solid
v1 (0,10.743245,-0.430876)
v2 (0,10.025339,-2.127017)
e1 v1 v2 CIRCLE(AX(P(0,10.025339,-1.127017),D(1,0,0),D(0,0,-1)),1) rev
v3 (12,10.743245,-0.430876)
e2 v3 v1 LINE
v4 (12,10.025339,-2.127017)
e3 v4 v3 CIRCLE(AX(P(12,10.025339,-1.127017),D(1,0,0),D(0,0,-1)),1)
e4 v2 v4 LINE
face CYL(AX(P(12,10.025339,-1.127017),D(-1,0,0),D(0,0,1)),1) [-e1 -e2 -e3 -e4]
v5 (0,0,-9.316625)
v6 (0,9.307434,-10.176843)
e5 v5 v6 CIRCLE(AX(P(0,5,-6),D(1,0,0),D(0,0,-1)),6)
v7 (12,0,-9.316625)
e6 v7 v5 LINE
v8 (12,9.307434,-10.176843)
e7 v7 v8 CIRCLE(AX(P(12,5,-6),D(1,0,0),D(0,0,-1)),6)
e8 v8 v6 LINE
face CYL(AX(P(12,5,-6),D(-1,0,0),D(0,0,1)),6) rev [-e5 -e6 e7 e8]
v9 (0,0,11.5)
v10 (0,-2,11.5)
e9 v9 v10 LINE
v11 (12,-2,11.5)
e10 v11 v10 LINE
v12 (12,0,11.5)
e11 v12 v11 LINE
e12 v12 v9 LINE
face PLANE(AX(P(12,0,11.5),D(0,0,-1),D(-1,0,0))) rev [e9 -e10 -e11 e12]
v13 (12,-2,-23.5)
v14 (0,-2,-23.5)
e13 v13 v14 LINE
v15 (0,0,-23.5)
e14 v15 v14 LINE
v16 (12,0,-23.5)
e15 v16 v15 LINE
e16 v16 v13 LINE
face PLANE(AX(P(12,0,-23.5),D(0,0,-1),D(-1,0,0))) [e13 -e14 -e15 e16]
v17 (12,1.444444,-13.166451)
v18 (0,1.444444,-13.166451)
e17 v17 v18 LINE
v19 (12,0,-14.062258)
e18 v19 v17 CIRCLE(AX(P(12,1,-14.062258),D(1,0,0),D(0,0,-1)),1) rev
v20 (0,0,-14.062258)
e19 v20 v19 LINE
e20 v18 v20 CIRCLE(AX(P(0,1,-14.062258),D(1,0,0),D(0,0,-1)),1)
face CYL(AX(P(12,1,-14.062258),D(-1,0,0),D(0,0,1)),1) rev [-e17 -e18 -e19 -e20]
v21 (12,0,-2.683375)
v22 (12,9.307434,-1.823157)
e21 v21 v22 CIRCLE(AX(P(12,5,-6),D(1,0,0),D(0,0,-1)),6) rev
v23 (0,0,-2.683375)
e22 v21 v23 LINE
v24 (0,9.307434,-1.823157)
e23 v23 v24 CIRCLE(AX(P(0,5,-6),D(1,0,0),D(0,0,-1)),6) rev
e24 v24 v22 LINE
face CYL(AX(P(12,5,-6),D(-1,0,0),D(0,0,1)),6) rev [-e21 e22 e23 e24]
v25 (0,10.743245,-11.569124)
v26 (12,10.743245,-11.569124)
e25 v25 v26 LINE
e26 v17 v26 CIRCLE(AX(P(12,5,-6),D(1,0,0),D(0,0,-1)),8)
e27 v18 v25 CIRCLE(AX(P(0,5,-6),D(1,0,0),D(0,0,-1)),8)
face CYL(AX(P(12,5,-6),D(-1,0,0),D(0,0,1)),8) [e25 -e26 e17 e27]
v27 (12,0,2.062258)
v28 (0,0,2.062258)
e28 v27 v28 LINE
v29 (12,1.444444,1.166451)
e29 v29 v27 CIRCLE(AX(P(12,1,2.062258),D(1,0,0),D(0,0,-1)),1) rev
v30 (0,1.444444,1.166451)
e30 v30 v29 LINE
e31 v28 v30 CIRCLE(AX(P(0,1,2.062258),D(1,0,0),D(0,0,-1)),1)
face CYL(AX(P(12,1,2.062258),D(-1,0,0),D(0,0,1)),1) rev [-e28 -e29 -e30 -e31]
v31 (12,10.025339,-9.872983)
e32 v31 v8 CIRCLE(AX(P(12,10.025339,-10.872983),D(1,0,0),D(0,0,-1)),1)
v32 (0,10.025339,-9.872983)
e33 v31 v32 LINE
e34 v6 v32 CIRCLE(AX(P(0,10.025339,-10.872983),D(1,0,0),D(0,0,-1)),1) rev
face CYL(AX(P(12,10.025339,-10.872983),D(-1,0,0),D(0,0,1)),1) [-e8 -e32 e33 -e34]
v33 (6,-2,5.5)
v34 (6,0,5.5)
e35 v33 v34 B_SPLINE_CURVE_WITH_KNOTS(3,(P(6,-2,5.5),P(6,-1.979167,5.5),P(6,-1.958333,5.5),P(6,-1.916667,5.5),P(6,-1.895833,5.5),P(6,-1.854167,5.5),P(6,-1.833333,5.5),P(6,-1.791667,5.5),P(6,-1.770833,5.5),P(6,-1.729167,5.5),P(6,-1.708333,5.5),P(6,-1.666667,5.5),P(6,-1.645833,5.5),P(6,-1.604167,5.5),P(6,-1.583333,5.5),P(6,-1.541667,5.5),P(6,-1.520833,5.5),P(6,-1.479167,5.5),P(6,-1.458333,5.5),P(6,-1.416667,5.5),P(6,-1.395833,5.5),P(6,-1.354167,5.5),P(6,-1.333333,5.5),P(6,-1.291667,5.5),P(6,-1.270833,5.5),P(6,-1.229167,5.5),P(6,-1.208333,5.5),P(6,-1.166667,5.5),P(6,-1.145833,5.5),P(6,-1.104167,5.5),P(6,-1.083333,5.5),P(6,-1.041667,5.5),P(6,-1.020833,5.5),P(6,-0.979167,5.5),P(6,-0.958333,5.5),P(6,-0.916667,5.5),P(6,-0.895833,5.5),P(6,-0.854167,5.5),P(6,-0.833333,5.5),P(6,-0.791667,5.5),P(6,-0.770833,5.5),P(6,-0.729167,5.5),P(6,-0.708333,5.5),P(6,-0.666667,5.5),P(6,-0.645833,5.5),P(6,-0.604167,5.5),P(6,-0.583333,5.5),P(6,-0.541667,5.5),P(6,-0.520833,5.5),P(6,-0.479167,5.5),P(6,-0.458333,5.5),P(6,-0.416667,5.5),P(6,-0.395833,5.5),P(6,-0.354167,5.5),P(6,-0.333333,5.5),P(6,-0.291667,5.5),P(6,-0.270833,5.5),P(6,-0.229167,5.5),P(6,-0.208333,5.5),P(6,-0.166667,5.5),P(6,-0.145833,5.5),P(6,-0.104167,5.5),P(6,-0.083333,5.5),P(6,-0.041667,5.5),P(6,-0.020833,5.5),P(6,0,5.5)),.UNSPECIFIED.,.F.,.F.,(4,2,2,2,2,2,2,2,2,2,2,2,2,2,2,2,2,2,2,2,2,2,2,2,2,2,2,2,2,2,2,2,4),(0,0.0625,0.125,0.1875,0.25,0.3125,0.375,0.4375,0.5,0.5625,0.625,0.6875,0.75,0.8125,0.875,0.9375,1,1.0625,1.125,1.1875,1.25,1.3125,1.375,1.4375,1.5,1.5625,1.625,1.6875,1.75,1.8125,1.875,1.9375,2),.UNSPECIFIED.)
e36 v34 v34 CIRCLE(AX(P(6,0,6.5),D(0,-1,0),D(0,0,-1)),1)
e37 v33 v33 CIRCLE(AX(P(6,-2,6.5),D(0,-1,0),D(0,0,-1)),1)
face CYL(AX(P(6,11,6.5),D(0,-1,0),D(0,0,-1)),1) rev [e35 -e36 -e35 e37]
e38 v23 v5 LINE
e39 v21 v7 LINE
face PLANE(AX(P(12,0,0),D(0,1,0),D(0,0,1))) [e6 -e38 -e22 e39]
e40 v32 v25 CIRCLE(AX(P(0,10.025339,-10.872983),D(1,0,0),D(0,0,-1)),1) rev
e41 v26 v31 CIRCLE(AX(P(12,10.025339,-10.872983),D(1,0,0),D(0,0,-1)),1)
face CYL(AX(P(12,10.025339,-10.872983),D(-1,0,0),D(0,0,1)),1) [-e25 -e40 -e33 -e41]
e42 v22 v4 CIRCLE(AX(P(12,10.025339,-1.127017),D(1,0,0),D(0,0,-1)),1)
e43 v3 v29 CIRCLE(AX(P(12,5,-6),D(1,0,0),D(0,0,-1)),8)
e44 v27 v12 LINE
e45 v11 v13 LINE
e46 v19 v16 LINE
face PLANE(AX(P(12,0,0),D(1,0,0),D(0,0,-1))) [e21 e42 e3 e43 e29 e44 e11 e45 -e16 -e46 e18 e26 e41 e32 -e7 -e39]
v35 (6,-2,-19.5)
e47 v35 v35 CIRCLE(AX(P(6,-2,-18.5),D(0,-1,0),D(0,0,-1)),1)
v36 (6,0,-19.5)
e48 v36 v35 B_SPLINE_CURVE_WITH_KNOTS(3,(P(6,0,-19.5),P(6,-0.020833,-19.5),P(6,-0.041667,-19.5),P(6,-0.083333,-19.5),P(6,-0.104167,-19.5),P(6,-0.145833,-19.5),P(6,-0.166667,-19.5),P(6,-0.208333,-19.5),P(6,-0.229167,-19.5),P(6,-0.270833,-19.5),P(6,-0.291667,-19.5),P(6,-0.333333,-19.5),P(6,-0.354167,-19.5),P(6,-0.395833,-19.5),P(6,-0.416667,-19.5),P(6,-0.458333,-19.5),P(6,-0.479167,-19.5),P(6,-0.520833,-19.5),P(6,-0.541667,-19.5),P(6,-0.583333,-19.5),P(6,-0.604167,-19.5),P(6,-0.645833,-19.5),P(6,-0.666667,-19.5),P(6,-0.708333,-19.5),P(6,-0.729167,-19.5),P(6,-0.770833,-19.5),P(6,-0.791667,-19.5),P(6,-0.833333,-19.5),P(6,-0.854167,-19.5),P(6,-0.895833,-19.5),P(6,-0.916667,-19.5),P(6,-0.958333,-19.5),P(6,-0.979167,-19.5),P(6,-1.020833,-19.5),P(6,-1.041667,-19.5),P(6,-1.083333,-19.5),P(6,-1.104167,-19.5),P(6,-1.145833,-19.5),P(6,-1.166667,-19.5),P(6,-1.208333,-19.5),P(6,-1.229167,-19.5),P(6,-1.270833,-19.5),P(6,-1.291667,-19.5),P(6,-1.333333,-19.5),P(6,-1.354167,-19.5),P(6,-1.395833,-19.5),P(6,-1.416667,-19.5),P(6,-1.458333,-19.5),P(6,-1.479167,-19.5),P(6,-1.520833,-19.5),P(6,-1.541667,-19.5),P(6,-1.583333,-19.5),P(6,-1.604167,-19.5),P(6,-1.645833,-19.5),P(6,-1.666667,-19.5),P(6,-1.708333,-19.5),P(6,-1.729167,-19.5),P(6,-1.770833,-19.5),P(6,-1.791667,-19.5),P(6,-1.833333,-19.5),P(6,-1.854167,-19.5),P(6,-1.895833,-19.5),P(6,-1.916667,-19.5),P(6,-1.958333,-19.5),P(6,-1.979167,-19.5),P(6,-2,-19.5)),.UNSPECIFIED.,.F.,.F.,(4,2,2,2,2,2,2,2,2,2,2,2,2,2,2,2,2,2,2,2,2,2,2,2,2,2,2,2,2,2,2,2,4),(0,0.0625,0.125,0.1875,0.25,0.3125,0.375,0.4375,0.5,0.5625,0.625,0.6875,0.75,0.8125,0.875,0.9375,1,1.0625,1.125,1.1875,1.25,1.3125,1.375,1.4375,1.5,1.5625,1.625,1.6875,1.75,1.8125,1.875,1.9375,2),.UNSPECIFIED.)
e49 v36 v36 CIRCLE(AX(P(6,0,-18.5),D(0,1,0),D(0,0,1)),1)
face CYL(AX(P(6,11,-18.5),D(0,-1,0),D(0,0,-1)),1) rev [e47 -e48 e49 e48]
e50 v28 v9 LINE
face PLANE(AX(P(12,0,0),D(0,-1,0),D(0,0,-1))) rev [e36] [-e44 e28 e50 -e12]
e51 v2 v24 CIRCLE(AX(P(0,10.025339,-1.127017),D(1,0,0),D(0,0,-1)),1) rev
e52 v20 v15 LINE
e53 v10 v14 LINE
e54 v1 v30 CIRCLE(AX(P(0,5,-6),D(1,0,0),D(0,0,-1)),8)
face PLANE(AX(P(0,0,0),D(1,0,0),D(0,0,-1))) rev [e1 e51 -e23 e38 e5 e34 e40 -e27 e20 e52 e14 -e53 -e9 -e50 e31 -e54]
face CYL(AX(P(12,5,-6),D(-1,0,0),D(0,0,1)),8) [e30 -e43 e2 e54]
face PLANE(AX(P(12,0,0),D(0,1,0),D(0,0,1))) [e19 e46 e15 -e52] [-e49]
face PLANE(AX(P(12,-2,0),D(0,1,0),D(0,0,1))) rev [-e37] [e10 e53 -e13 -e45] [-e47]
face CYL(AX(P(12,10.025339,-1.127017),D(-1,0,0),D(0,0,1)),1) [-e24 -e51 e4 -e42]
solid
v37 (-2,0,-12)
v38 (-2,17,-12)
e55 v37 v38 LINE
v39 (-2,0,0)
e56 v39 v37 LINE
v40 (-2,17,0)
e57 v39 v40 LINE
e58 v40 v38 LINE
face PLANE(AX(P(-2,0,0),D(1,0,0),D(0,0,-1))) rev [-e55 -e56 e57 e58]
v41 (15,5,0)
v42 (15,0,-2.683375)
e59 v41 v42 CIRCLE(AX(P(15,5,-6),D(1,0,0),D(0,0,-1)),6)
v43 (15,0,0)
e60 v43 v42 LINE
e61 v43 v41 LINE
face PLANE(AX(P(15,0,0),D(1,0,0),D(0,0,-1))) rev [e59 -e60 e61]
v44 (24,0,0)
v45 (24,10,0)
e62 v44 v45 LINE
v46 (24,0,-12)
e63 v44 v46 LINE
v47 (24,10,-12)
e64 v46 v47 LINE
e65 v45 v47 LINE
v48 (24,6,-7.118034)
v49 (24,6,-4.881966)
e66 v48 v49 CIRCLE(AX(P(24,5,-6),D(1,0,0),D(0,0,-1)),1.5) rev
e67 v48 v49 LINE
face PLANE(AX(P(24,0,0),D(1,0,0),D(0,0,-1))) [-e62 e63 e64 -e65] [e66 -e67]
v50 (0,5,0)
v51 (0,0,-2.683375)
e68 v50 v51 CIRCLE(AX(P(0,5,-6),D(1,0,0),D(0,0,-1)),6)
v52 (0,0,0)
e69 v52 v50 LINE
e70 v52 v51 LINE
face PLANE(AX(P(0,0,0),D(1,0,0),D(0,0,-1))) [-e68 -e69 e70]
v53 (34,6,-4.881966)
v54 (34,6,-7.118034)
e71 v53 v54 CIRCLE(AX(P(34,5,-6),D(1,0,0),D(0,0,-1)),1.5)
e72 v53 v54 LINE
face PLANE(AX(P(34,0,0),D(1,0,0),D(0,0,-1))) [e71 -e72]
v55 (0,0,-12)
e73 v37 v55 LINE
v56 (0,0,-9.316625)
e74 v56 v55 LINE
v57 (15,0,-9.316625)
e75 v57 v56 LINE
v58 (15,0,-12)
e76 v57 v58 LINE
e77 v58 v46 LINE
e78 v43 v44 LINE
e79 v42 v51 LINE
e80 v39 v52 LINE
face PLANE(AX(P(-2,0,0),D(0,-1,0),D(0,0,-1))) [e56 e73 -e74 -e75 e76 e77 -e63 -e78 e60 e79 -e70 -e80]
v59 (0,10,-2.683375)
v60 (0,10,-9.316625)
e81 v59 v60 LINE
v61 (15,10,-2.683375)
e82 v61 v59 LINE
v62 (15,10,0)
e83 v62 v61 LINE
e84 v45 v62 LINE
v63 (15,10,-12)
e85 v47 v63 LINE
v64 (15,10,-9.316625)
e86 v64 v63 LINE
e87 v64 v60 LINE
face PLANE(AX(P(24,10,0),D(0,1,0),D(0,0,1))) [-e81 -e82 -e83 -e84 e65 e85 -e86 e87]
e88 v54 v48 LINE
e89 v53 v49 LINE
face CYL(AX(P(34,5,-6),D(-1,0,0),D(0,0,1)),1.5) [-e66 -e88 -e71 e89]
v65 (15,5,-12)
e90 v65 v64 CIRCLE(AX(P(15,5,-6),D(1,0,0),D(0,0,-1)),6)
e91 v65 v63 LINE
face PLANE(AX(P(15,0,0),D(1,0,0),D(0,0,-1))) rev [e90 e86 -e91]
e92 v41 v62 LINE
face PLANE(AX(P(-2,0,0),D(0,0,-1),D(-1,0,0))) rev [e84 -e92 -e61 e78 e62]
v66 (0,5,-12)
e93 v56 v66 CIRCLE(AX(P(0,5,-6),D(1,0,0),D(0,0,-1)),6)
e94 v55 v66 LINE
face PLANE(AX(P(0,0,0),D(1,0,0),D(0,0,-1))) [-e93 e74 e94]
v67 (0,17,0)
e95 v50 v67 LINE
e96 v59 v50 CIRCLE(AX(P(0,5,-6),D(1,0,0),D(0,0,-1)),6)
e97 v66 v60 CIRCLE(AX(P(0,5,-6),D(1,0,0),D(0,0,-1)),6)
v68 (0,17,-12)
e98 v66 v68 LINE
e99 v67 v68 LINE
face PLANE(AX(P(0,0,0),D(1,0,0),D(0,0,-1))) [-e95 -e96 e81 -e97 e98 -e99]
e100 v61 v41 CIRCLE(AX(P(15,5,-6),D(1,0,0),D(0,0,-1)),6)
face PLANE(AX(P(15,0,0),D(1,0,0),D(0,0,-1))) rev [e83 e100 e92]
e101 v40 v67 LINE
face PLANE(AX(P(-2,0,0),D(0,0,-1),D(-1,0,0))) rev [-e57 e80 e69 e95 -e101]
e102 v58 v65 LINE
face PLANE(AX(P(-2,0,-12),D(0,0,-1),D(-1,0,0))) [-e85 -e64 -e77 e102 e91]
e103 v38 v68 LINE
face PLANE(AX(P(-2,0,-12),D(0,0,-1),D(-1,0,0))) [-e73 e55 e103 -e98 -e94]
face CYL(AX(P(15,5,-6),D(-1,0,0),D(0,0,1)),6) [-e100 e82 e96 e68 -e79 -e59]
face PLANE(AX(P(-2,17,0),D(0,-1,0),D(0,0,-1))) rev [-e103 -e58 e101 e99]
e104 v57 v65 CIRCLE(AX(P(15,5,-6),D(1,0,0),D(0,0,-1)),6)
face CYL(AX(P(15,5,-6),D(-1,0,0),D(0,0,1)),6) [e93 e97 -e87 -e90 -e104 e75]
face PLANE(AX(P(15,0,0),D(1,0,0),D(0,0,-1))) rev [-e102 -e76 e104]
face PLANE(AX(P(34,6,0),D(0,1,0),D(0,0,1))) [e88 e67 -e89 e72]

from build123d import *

# Parameters (mm, degrees)
BOSS_EXTRUDE1_DEPTH = 2
BOSS_EXTRUDE2_DEPTH = 24
CUT_EXTRUDE1_DEPTH  = 15
BOSS_EXTRUDE3_DEPTH = 34
BOSS_EXTRUDE4_DEPTH = 12
SKETCH3_R           = 1
CUT_EXTRUDE2_DEPTH  = 13
FILLET1_R           = 1


with BuildPart() as part:
    # Sketch1 → Boss-Extrude1 (new body)
    with BuildSketch(Plane(origin=(0, 0, 0), x_dir=(0, 0, -1), z_dir=(1, 0, 0))):
        Polygon((0, 17), (0, 10), (2.68337521, 10), (6, 10), (9.31662479, 10), (12, 10), (12, 17), align=None)
        with BuildLine():
            Line((2.68337521, 10), (0, 10))
            Line((0, 10), (0, 5.000000026))
            ThreePointArc((0, 5.000000026), (0.713235932, 7.837274342), (2.68337521, 10))
        make_face()
        with BuildLine():
            Line((9.31662479, 10), (6, 10))
            Line((6, 10), (6, 6))
            Line((6, 6), (7.118033989, 6))
            ThreePointArc((7.118033989, 6), (7.369306394, 4.387627564), (6, 3.5))
            Line((6, 3.5), (6, 0))
            Line((6, 0), (9.31662479, 0))
            ThreePointArc((9.31662479, 0), (11.286764069, 2.16272566), (12, 4.999999979))
            ThreePointArc((12, 4.999999979), (11.286764079, 7.837274322), (9.31662479, 10))
        make_face()
        with BuildLine():
            Line((12, 10), (9.31662479, 10))
            ThreePointArc((9.31662479, 10), (11.286764079, 7.837274322), (12, 4.999999979))
            Line((12, 4.999999979), (12, 10))
        make_face()
        with BuildLine():
            Line((12, 0), (12, 4.999999979))
            ThreePointArc((12, 4.999999979), (11.286764069, 2.16272566), (9.31662479, 0))
            Line((9.31662479, 0), (12, 0))
        make_face()
        with BuildLine():
            ThreePointArc((2.68337521, 0), (0.71323592, 2.16272568), (0, 5.000000026))
            Line((0, 5.000000026), (0, 0))
            Line((0, 0), (2.68337521, 0))
        make_face()
        with BuildLine():
            Line((6, 10), (2.68337521, 10))
            ThreePointArc((2.68337521, 10), (0.713235932, 7.837274342), (0, 5.000000026))
            ThreePointArc((0, 5.000000026), (0.71323592, 2.16272568), (2.68337521, 0))
            Line((2.68337521, 0), (6, 0))
            Line((6, 0), (6, 3.5))
            ThreePointArc((6, 3.5), (4.630693606, 4.387627564), (4.881966011, 6))
            Line((4.881966011, 6), (6, 6))
            Line((6, 6), (6, 10))
        make_face()
        with BuildLine():
            Line((7.118033989, 6), (6, 6))
            Line((6, 6), (6, 3.5))
            ThreePointArc((6, 3.5), (7.369306394, 4.387627564), (7.118033989, 6))
        make_face()
        with BuildLine():
            Line((6, 3.5), (6, 6))
            Line((6, 6), (4.881966011, 6))
            ThreePointArc((4.881966011, 6), (4.630693606, 4.387627564), (6, 3.5))
        make_face()
    extrude(amount=-BOSS_EXTRUDE1_DEPTH)

    # Sketch1<3> → Boss-Extrude2 (add)
    with BuildSketch(Plane(origin=(0, 0, 0), x_dir=(0, 0, -1), z_dir=(1, 0, 0))):
        with BuildLine():
            Line((9.31662479, 10), (6, 10))
            Line((6, 10), (6, 6))
            Line((6, 6), (7.118033989, 6))
            ThreePointArc((7.118033989, 6), (7.369306394, 4.387627564), (6, 3.5))
            Line((6, 3.5), (6, 0))
            Line((6, 0), (9.31662479, 0))
            ThreePointArc((9.31662479, 0), (11.286764069, 2.16272566), (12, 4.999999979))
            ThreePointArc((12, 4.999999979), (11.286764079, 7.837274322), (9.31662479, 10))
        make_face()
        with BuildLine():
            Line((12, 10), (9.31662479, 10))
            ThreePointArc((9.31662479, 10), (11.286764079, 7.837274322), (12, 4.999999979))
            Line((12, 4.999999979), (12, 10))
        make_face()
        with BuildLine():
            Line((12, 0), (12, 4.999999979))
            ThreePointArc((12, 4.999999979), (11.286764069, 2.16272566), (9.31662479, 0))
            Line((9.31662479, 0), (12, 0))
        make_face()
        with BuildLine():
            Line((6, 10), (2.68337521, 10))
            ThreePointArc((2.68337521, 10), (0.713235932, 7.837274342), (0, 5.000000026))
            ThreePointArc((0, 5.000000026), (0.71323592, 2.16272568), (2.68337521, 0))
            Line((2.68337521, 0), (6, 0))
            Line((6, 0), (6, 3.5))
            ThreePointArc((6, 3.5), (4.630693606, 4.387627564), (4.881966011, 6))
            Line((4.881966011, 6), (6, 6))
            Line((6, 6), (6, 10))
        make_face()
        with BuildLine():
            ThreePointArc((2.68337521, 0), (0.71323592, 2.16272568), (0, 5.000000026))
            Line((0, 5.000000026), (0, 0))
            Line((0, 0), (2.68337521, 0))
        make_face()
        with BuildLine():
            Line((2.68337521, 10), (0, 10))
            Line((0, 10), (0, 5.000000026))
            ThreePointArc((0, 5.000000026), (0.713235932, 7.837274342), (2.68337521, 10))
        make_face()
        with BuildLine():
            Line((7.118033989, 6), (6, 6))
            Line((6, 6), (6, 3.5))
            ThreePointArc((6, 3.5), (7.369306394, 4.387627564), (7.118033989, 6))
        make_face()
        with BuildLine():
            Line((6, 3.5), (6, 6))
            Line((6, 6), (4.881966011, 6))
            ThreePointArc((4.881966011, 6), (4.630693606, 4.387627564), (6, 3.5))
        make_face()
    extrude(amount=BOSS_EXTRUDE2_DEPTH)

    # Sketch1<4> → Cut-Extrude1 (cut)
    with BuildSketch(Plane(origin=(0, 0, 0), x_dir=(0, 0, -1), z_dir=(1, 0, 0))):
        with BuildLine():
            Line((12, 10), (9.31662479, 10))
            ThreePointArc((9.31662479, 10), (11.286764079, 7.837274322), (12, 4.999999979))
            Line((12, 4.999999979), (12, 10))
        make_face()
        with BuildLine():
            Line((2.68337521, 10), (0, 10))
            Line((0, 10), (0, 5.000000026))
            ThreePointArc((0, 5.000000026), (0.713235932, 7.837274342), (2.68337521, 10))
        make_face()
        with BuildLine():
            ThreePointArc((2.68337521, 0), (0.71323592, 2.16272568), (0, 5.000000026))
            Line((0, 5.000000026), (0, 0))
            Line((0, 0), (2.68337521, 0))
        make_face()
        with BuildLine():
            Line((12, 0), (12, 4.999999979))
            ThreePointArc((12, 4.999999979), (11.286764069, 2.16272566), (9.31662479, 0))
            Line((9.31662479, 0), (12, 0))
        make_face()
    extrude(amount=CUT_EXTRUDE1_DEPTH, mode=Mode.SUBTRACT)

    # Sketch1<5> → Boss-Extrude3 (add)
    with BuildSketch(Plane(origin=(0, 0, 0), x_dir=(0, 0, -1), z_dir=(1, 0, 0))):
        with BuildLine():
            Line((7.118033989, 6), (6, 6))
            Line((6, 6), (6, 3.5))
            ThreePointArc((6, 3.5), (7.369306394, 4.387627564), (7.118033989, 6))
        make_face()
        with BuildLine():
            Line((6, 3.5), (6, 6))
            Line((6, 6), (4.881966011, 6))
            ThreePointArc((4.881966011, 6), (4.630693606, 4.387627564), (6, 3.5))
        make_face()
    extrude(amount=BOSS_EXTRUDE3_DEPTH)


with BuildPart() as body_2:
    # Sketch2 → Boss-Extrude4 (new body)
    with BuildSketch(Plane(origin=(0, 0, 0), x_dir=(0, 0, -1), z_dir=(1, 0, 0))):
        with BuildLine():
            Line((0, 10.291502622), (0, 5))
            ThreePointArc((0, 5), (0.557670532, 7.526074021), (2.127016654, 9.582575695))
            Line((2.127016654, 9.582575695), (2.127016654, 12))
            ThreePointArc((2.127016654, 12), (0.990140635, 11.237091401), (0, 10.291502622))
        make_face()
        with BuildLine():
            Line((9.31662479, 0), (2.68337521, 0))
            ThreePointArc((2.68337521, 0), (0.713235926, 2.162725669), (0, 5))
            Line((0, 5), (0, 10.291502622))
            ThreePointArc((0, 10.291502622), (-1.483314774, 7.828427125), (-2, 5))
            ThreePointArc((-2, 5), (-1.548509256, 2.350470229), (-0.244997998, 0))
            Line((-0.244997998, 0), (-11.5, 0))
            Line((-11.5, 0), (-11.5, -2))
            Line((-11.5, -2), (23.5, -2))
            Line((23.5, -2), (23.5, 0))
            Line((23.5, 0), (12.244997998, 0))
            ThreePointArc((12.244997998, 0), (13.548509256, 2.350470229), (14, 5))
            ThreePointArc((14, 5), (13.483314774, 7.828427125), (12, 10.291502622))
            Line((12, 10.291502622), (12, 5))
            ThreePointArc((12, 5), (11.286764074, 2.162725669), (9.31662479, 0))
        make_face()
        with BuildLine():
            ThreePointArc((9.872983346, 9.582575695), (11.442329468, 7.526074021), (12, 5))
            Line((12, 5), (12, 10.291502622))
            ThreePointArc((12, 10.291502622), (11.009859365, 11.237091401), (9.872983346, 12))
            Line((9.872983346, 12), (9.872983346, 9.582575695))
        make_face()
    extrude(amount=BOSS_EXTRUDE4_DEPTH)

    # Sketch3 → Cut-Extrude2 (cut)
    with BuildSketch(Plane.XZ.offset(2)):
        with Locations(Location((6, 6.5, 0), (0, 0, 270))):
            Circle(SKETCH3_R)
        with Locations(Location((6, -18.5, 0), (0, 0, 270))):
            Circle(SKETCH3_R)
    extrude(amount=-CUT_EXTRUDE2_DEPTH, mode=Mode.SUBTRACT)

    # Fillet1
    fillet1_edges = [body_2.edges().sort_by_distance(p)[0] for p in [
        (6, 0, -12.244997998),
        (6, 0, 0.244997998),
        (6, 9.582575695, -2.127016654),
        (6, 9.582575695, -9.872983346),
        (6, 12, -9.872983346),
        (6, 12, -2.127016654),
    ]]
    fillet(fillet1_edges, radius=FILLET1_R - 0.0001)  # a hair under: the kernel refuses the full size


solid = Compound([part.part, body_2.part])
